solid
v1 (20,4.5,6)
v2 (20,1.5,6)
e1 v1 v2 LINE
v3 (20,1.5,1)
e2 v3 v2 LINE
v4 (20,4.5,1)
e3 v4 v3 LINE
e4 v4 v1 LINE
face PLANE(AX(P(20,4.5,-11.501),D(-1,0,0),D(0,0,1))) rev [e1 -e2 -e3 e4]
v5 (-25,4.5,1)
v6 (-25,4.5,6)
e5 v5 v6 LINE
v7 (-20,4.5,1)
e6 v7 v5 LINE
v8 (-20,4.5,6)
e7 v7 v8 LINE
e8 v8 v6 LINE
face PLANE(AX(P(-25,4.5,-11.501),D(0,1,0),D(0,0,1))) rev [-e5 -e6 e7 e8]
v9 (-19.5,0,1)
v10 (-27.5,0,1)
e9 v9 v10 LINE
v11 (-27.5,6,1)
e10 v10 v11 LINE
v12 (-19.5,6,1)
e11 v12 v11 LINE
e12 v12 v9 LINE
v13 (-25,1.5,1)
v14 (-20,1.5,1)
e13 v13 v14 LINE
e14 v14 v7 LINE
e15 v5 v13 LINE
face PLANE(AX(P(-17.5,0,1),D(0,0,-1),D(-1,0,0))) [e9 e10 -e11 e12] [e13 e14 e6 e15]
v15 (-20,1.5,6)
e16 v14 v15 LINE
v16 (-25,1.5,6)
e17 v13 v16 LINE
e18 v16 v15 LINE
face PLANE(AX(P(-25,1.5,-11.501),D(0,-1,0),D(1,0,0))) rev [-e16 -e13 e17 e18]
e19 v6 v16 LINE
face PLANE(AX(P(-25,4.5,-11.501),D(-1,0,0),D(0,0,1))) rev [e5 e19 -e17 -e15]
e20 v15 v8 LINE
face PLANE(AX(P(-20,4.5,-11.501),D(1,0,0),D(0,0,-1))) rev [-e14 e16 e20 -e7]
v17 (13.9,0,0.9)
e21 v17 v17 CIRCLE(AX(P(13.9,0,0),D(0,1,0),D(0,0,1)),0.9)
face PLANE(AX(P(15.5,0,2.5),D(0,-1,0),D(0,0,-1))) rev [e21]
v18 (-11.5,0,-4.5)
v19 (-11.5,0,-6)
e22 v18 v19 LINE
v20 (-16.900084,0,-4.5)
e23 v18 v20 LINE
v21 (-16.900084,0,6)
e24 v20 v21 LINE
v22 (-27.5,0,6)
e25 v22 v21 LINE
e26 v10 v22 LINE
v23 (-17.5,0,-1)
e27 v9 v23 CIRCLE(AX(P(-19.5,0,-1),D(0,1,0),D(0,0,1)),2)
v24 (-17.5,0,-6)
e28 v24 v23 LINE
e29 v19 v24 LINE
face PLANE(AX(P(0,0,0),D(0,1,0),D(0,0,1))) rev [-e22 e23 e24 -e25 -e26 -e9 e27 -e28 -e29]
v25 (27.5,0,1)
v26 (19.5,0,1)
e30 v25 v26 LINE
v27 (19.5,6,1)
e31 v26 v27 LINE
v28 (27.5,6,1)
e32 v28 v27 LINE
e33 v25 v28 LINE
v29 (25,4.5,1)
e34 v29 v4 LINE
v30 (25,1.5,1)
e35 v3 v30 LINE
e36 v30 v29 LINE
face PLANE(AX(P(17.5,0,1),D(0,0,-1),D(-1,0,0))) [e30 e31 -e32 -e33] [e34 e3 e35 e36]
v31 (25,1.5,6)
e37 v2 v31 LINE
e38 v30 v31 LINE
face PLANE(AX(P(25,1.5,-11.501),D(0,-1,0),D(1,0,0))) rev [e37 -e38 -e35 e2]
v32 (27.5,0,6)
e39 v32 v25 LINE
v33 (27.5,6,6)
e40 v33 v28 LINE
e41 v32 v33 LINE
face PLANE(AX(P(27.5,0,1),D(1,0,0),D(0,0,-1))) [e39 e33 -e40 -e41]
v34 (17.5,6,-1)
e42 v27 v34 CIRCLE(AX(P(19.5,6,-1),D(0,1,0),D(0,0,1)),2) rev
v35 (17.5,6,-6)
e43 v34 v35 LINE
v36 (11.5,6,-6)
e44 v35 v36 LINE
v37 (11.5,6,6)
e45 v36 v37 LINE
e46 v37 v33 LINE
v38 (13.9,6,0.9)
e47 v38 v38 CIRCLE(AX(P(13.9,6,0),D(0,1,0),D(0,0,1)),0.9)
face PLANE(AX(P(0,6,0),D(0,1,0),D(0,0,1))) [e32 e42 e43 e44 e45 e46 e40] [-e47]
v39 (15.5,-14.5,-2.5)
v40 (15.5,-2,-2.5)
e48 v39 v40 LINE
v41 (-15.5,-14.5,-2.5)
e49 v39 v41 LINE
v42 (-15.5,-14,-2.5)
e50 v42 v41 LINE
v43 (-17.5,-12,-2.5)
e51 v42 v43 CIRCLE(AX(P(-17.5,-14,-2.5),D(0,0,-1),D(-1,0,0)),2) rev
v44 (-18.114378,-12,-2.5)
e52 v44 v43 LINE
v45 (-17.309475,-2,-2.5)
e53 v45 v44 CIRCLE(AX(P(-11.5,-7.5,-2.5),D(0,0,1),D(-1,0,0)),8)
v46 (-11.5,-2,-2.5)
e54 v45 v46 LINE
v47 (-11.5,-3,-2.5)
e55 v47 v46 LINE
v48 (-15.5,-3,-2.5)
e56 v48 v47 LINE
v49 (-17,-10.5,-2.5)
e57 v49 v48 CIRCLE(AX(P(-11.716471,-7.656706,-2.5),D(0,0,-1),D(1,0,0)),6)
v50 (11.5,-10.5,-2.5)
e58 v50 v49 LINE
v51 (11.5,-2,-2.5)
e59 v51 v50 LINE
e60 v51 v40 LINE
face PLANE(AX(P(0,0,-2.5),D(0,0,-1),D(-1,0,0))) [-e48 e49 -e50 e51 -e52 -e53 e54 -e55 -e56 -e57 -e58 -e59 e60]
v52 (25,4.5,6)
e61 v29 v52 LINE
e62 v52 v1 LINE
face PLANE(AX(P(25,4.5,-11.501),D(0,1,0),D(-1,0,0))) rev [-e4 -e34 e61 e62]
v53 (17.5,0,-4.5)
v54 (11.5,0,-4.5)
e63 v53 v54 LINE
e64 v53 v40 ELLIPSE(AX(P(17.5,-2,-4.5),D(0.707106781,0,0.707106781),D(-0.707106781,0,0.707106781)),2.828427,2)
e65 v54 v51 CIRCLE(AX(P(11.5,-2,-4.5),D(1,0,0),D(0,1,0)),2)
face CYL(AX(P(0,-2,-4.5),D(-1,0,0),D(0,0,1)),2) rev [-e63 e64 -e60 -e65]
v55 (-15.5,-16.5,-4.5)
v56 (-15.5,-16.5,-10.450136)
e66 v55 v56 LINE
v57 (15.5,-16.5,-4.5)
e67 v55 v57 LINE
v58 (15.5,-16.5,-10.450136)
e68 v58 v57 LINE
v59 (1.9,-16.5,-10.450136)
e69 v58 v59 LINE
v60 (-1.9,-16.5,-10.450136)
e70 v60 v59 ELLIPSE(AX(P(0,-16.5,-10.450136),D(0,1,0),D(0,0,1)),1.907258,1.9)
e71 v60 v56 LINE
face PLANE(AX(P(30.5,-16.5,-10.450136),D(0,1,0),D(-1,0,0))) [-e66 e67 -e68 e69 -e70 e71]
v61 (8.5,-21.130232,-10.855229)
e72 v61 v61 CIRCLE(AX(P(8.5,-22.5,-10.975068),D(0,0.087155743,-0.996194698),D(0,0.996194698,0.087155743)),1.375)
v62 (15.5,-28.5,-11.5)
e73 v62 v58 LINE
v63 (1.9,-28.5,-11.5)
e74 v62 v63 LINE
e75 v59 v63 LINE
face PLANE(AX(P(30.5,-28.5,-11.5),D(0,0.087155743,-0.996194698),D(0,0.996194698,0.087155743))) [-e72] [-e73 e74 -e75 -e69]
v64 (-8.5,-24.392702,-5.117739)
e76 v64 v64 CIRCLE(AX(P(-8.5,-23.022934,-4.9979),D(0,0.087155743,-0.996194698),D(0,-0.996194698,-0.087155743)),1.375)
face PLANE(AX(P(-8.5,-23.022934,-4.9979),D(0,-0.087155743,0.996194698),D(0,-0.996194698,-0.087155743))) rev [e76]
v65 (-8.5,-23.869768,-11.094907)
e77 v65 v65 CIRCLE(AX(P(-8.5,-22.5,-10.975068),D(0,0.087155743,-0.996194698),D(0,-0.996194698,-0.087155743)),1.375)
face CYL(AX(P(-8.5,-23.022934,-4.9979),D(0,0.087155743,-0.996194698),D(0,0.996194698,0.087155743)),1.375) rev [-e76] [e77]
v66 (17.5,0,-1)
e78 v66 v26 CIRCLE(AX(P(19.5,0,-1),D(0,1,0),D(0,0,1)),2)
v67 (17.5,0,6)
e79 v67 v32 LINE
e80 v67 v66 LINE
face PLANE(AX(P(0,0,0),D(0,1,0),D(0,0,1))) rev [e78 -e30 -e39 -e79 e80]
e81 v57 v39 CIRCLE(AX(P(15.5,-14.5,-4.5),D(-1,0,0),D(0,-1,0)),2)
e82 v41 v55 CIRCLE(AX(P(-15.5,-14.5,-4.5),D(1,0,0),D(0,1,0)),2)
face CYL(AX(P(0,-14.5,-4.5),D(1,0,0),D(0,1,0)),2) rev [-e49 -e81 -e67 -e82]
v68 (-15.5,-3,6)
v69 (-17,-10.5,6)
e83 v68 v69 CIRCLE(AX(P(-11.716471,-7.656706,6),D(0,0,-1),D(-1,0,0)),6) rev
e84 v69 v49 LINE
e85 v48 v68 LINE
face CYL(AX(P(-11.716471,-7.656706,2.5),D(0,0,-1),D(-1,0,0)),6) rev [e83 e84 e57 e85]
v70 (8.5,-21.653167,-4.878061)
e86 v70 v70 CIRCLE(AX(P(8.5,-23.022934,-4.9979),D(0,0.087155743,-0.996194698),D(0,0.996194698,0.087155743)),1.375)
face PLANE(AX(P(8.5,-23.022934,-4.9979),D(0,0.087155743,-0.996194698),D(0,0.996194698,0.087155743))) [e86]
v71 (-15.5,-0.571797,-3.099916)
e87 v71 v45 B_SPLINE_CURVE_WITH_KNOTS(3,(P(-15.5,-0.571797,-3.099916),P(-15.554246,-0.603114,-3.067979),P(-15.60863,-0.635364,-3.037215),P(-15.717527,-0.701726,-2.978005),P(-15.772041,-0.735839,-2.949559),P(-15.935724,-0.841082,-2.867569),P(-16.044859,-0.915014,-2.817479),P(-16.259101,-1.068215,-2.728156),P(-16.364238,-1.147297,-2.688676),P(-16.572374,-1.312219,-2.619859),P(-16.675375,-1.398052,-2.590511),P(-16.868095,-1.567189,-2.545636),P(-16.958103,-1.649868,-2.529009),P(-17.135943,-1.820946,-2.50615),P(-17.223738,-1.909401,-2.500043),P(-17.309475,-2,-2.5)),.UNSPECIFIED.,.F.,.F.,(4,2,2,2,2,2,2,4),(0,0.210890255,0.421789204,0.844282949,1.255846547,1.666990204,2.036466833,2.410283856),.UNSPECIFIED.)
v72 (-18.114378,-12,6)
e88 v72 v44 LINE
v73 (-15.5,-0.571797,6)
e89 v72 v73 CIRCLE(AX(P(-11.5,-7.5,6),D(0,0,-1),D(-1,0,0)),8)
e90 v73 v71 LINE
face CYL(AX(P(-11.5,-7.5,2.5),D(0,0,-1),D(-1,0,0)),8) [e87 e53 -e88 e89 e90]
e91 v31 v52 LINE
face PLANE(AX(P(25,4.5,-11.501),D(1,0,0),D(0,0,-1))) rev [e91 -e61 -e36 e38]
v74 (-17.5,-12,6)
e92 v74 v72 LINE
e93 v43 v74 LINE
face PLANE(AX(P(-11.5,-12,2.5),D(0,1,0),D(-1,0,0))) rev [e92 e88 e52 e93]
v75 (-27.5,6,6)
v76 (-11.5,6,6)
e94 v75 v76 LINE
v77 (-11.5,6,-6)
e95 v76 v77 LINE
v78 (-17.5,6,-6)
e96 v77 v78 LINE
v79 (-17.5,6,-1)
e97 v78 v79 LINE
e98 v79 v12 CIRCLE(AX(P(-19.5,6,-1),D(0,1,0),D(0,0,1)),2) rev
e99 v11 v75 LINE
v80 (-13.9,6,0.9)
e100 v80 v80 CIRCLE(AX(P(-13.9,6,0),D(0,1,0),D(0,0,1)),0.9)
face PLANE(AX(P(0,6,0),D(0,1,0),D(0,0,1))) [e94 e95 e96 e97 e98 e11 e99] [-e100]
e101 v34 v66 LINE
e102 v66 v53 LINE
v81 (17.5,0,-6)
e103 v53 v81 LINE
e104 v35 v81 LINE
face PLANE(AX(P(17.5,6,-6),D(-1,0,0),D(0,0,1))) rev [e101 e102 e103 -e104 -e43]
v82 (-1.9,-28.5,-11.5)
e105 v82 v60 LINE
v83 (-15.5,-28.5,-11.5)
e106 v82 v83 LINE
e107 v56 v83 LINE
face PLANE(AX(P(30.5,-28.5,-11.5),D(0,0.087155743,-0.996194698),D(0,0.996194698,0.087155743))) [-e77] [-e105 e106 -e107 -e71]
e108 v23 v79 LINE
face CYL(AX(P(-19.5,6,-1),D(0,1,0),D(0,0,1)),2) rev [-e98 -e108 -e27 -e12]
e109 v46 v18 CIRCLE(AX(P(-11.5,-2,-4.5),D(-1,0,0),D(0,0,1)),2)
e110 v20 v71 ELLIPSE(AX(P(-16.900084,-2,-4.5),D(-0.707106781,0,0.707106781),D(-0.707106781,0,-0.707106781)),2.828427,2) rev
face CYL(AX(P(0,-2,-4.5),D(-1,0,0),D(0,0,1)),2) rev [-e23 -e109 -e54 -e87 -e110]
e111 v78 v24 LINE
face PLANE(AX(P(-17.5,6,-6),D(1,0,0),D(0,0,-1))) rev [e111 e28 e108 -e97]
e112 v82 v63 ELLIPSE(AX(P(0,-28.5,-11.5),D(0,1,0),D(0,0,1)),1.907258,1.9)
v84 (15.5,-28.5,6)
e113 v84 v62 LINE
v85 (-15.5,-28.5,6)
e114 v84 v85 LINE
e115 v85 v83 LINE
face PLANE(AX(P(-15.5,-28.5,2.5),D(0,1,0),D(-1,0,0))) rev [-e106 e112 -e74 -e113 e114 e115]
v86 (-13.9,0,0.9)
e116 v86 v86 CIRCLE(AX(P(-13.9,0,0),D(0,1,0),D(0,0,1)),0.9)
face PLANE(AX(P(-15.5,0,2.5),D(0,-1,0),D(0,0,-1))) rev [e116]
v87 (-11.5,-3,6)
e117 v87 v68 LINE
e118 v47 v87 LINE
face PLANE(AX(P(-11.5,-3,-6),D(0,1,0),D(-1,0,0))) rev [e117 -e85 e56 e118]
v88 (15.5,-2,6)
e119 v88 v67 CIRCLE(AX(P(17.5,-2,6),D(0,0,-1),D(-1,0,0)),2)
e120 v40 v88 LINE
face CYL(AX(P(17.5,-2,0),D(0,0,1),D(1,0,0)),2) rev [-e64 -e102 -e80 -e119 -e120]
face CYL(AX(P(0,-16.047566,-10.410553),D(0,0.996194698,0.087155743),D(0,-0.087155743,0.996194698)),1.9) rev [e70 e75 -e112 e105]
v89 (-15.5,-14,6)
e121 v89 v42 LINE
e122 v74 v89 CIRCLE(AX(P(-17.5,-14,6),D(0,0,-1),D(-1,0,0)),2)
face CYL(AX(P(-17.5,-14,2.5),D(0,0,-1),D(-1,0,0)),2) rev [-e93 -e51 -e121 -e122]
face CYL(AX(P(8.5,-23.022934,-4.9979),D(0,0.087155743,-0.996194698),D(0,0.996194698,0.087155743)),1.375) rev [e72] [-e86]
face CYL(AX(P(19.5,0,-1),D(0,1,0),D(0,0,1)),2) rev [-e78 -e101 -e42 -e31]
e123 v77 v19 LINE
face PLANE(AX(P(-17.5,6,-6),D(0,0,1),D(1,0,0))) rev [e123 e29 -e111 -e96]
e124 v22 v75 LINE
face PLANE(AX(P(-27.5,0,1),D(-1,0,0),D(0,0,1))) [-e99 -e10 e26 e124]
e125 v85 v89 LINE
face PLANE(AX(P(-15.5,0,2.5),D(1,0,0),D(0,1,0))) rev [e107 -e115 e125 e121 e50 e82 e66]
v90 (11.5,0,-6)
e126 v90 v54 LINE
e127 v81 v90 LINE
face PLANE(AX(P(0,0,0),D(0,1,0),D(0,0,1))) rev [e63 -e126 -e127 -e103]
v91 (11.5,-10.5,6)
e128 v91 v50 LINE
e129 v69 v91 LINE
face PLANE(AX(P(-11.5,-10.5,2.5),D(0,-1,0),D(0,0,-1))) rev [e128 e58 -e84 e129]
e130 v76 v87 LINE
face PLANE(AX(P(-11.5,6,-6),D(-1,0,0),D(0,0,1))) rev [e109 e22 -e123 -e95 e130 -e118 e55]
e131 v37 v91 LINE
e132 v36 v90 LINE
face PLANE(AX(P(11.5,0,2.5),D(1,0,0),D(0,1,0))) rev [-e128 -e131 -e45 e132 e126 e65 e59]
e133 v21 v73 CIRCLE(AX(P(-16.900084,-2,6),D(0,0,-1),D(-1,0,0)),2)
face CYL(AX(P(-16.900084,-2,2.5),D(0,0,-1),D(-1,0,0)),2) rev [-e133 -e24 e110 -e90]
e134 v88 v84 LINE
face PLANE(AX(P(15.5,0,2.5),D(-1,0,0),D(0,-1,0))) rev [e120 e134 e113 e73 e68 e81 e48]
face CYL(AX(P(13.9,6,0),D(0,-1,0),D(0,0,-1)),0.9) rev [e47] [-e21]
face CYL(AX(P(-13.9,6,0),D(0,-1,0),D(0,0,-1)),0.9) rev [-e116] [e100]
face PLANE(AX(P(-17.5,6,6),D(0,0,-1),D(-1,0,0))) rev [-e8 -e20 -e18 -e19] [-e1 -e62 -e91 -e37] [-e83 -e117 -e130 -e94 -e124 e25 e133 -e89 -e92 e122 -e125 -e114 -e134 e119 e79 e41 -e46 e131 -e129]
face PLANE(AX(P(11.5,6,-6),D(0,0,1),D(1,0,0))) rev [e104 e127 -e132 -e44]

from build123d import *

# Parameters (mm, degrees)
SKETCH1_W                   = 6
SKETCH1_H                   = 12
SKETCH1_R                   = 0.9
SERVO_MOUNTING_BASE_DEPTH   = 6
SERVO_MOUNTING_BASE_2_DEPTH = 6
SERVO_ENCLOSING_FRAME_DEPTH = 2.5
WIRE_SLOT_DEPTH             = 34.977934016
WIRE_SLOT_DEPTH_BACK        = 34.977934016
SKETCH6_W                   = 4
SKETCH6_H                   = 9
WIRE_COMPENSATION_DEPTH     = 2.5
CLAMP_EXTENSION_DEPTH       = 31
SKETCH12_W                  = 1.9
SKETCH12_H                  = 12.5
SKETCH13_R                  = 1.375
CLAMP_SCREW_HOLES_DEPTH     = 6
SKETCH15_W                  = 10
SKETCH15_H                  = 5
ZIPTIE_FLAPS_DEPTH          = 6
ZIPTIE_HOLES_REACH          = 45.298
SKETCH17_W                  = 5
SKETCH17_H                  = 3
FRONT_EXTENSION_DEPTH       = 3.5
F_2MM_FILLETS_R             = 2
MORE_2MM_FILLETS_R          = 2


with BuildPart() as part:
    # Sketch1 → Servo Mounting Base (new body)
    with BuildSketch(Plane(origin=(0, 0, 0), x_dir=(1, 0, 0), z_dir=(0, 1, 0))):
        with Locations((-14.5, 0)):
            Rectangle(SKETCH1_W, SKETCH1_H)
        with Locations(Location((-13.9, 0, 0), (0, 0, 270))):
            Circle(SKETCH1_R, mode=Mode.SUBTRACT)
    extrude(amount=SERVO_MOUNTING_BASE_DEPTH)



with BuildPart() as body_2:
    # Sketch1 → Servo Mounting Base 2 (new body)
    with BuildSketch(Plane(origin=(0, 0, 0), x_dir=(1, 0, 0), z_dir=(0, 1, 0))):
        with Locations((14.5, 0)):
            Rectangle(SKETCH1_W, SKETCH1_H)
        with Locations(Location((13.9, 0, 0), (0, 0, 270))):
            Circle(SKETCH1_R, mode=Mode.SUBTRACT)
    extrude(amount=SERVO_MOUNTING_BASE_2_DEPTH)


with BuildPart() as part_1:
    add(part.part)

    add(body_2.part)  # Servo Enclosing Frame merges body 2
    # Sketch2 → Servo Enclosing Frame (add, symmetric)
    with BuildSketch(Plane.XY):
        Polygon((-15.5, 0), (-15.5, -28.5), (15.5, -28.5), (15.5, 0), (11.5, 0), (11.5, -10.5), (-11.5, -10.5), (-11.5, 0), align=None)
    extrude(amount=SERVO_ENCLOSING_FRAME_DEPTH, both=True)

    # Sketch6 → Wire Slot (cut, two sides: drawn at the far end of the back side and taken through both)
    with BuildSketch(Plane.XY.offset(-WIRE_SLOT_DEPTH_BACK)):
        with Locations((-13.5, -7.5)):
            Rectangle(SKETCH6_W, SKETCH6_H)
    extrude(amount=WIRE_SLOT_DEPTH + WIRE_SLOT_DEPTH_BACK, mode=Mode.SUBTRACT)


with BuildPart() as wire_slot_piece_1:
    # of the separate pieces the step leaves, piece 1, a body of its own (wire_slot_pieces)
    add(part_1.part.solids().sort_by_distance((11.5, -10.5, -2.5))[0])



with BuildPart() as wire_slot_piece_2:
    # of the separate pieces the step leaves, piece 2, a body of its own (wire_slot_pieces)
    add(part_1.part.solids().sort_by_distance((-17.5, 0, -6))[0])


with BuildPart() as wire_slot_piece_1_1:
    add(wire_slot_piece_1.part)

    add(wire_slot_piece_2.part)  # Wire Compensation merges Wire Slot piece 2
    # Sketch7 → Wire Compensation (add, symmetric)
    with BuildSketch(Plane.XY):
        with BuildLine():
            Line((-11.5, -12), (-18.114378278, -12))
            ThreePointArc((-18.114378278, -12), (-19.298539211, -5.715963516), (-15.5, -0.57179677))
            Line((-15.5, -0.57179677), (-15.5, -3))
            ThreePointArc((-15.5, -3), (-17.599955118, -6.480008976), (-17, -10.5))
            Line((-17, -10.5), (-11.5, -10.5))
            Line((-11.5, -10.5), (-11.5, -12))
        make_face()
    extrude(amount=WIRE_COMPENSATION_DEPTH, both=True)

    # Sketch9 → Clamp Extension (add)
    with BuildSketch(Plane.ZY.offset(15.5)):
        Polygon((-2.5, -28.5), (-11.5, -28.5), (-10.450136038, -16.5), (-2.5, -16.5), align=None)
    extrude(amount=-CLAMP_EXTENSION_DEPTH)

    # Sketch12 → Wire Groove (revolve, cut)
    with BuildSketch(Plane(origin=(0, 0.781987502, -8.938158048), x_dir=(-1, 0, 0), z_dir=(0, 0.08715574274766176, -0.9961946980917453))):
        with Locations((-0.95, -23.143839937)):
            Rectangle(SKETCH12_W, SKETCH12_H)
    revolve(axis=Axis((0, -16.047566274, -10.410553216), (0, -0.9961946980917452, -0.0871557427476618)), mode=Mode.SUBTRACT)

    # Sketch13 → Clamp Screw Holes (cut)
    with BuildSketch(Plane(origin=(0, 0.781987502, -8.938158048), x_dir=(-1, 0, 0), z_dir=(0, 0.08715574274766176, -0.9961946980917453))):
        with Locations(Location((-8.5, -23.370920912, 0), (0, 0, 90))):
            Circle(SKETCH13_R)
        with Locations(Location((8.5, -23.370920912, 0), (0, 0, 270))):
            Circle(SKETCH13_R)
    extrude(amount=-CLAMP_SCREW_HOLES_DEPTH, mode=Mode.SUBTRACT)

    # Sketch15 → Ziptie Flaps (add)
    with BuildSketch(Plane(origin=(0, 6, 0), x_dir=(1, 0, 0), z_dir=(0, 1, 0))):
        with Locations((-22.5, -3.5)):
            Rectangle(SKETCH15_W, SKETCH15_H)
        with Locations((22.5, -3.5)):
            Rectangle(SKETCH15_W, SKETCH15_H)
    extrude(amount=-ZIPTIE_FLAPS_DEPTH)

    # Sketch17 → Ziptie Holes (cut, up to next)
    with BuildSketch(Plane.XY.offset(6), mode=Mode.PRIVATE) as ziptie_holes_sk1:
        with Locations((-22.5, 3)):
            Rectangle(SKETCH17_W, SKETCH17_H)
    ziptie_holes_tool1 = extrude(ziptie_holes_sk1.sketch, amount=-ZIPTIE_HOLES_REACH, mode=Mode.PRIVATE) & wire_slot_piece_1_1.part
    # Sketch17 → Ziptie Holes (cut, up to next)
    with BuildSketch(Plane.XY.offset(6), mode=Mode.PRIVATE) as ziptie_holes_sk2:
        with Locations((22.5, 3)):
            Rectangle(SKETCH17_W, SKETCH17_H)
    ziptie_holes_tool2 = extrude(ziptie_holes_sk2.sketch, amount=-ZIPTIE_HOLES_REACH, mode=Mode.PRIVATE) & wire_slot_piece_1_1.part
    add(ziptie_holes_tool1.solids().sort_by_distance((-22.5, 3, 6))[0], mode=Mode.SUBTRACT)
    add(ziptie_holes_tool2.solids().sort_by_distance((22.5, 3, 6))[0], mode=Mode.SUBTRACT)

    # Sketch16 → Front Extension (add)
    with BuildSketch(Plane.XY.offset(2.5)):
        with BuildLine():
            Line((-15.5, 0), (-15.5, -0.57179677))
            ThreePointArc((-15.5, -0.57179677), (-19.298539211, -5.715963516), (-18.114378278, -12))
            Line((-18.114378278, -12), (-15.5, -12))
            Line((-15.5, -12), (-15.5, -28.5))
            Line((-15.5, -28.5), (15.5, -28.5))
            Line((15.5, -28.5), (15.5, 0))
            Line((15.5, 0), (11.5, 0))
            Line((11.5, 0), (11.5, -10.5))
            Line((11.5, -10.5), (-17, -10.5))
            ThreePointArc((-17, -10.5), (-17.599955118, -6.480008976), (-15.5, -3))
            Line((-15.5, -3), (-11.5, -3))
            Line((-11.5, -3), (-11.5, 0))
            Line((-11.5, 0), (-15.5, 0))
        make_face()
    extrude(amount=FRONT_EXTENSION_DEPTH)

    # 2mm Fillets
    # the kernel refuses this fillet: 2 mm, written as the material it adds along each edge
    with BuildSketch(Plane(origin=(15.5, 0, 6), x_dir=(1, 0, 0), z_dir=(0, 0, -1)), Plane(origin=(-15.5, -12, 6), x_dir=(0, -1, 0), z_dir=(0, 0, -1))) as f_2mm_fillets_piece_1:
        with BuildLine():
            CenterArc((F_2MM_FILLETS_R, F_2MM_FILLETS_R), F_2MM_FILLETS_R, 180, 90)
            Line((0, F_2MM_FILLETS_R), (-F_2MM_FILLETS_R * 0.02, F_2MM_FILLETS_R))
            Line((-F_2MM_FILLETS_R * 0.02, F_2MM_FILLETS_R), (-F_2MM_FILLETS_R * 0.02, -F_2MM_FILLETS_R * 0.02))
            Line((-F_2MM_FILLETS_R * 0.02, -F_2MM_FILLETS_R * 0.02), (F_2MM_FILLETS_R, -F_2MM_FILLETS_R * 0.02))
            Line((F_2MM_FILLETS_R, -F_2MM_FILLETS_R * 0.02), (F_2MM_FILLETS_R, 0))
        make_face()
    extrude(amount=8.5)
    with BuildSketch(Plane(origin=(15.5, 0, -2.5), x_dir=(0, -1, 0), z_dir=(-1, 0, 0))) as f_2mm_fillets_piece_2:
        with BuildLine():
            CenterArc((F_2MM_FILLETS_R, -F_2MM_FILLETS_R), F_2MM_FILLETS_R, 90, 90)
            Line((0, -F_2MM_FILLETS_R), (-F_2MM_FILLETS_R * 0.02, -F_2MM_FILLETS_R))
            Line((-F_2MM_FILLETS_R * 0.02, -F_2MM_FILLETS_R), (-F_2MM_FILLETS_R * 0.02, F_2MM_FILLETS_R * 0.02))
            Line((-F_2MM_FILLETS_R * 0.02, F_2MM_FILLETS_R * 0.02), (F_2MM_FILLETS_R, F_2MM_FILLETS_R * 0.02))
            Line((F_2MM_FILLETS_R, F_2MM_FILLETS_R * 0.02), (F_2MM_FILLETS_R, 0))
        make_face()
    extrude(amount=4)
    with BuildSketch(Plane(origin=(-15.5, -16.5, -2.5), x_dir=(0, 1, 0), z_dir=(1, 0, 0))) as f_2mm_fillets_piece_3:
        with BuildLine():
            CenterArc((F_2MM_FILLETS_R, -F_2MM_FILLETS_R), F_2MM_FILLETS_R, 90, 90)
            Line((0, -F_2MM_FILLETS_R), (-F_2MM_FILLETS_R * 0.02, -F_2MM_FILLETS_R))
            Line((-F_2MM_FILLETS_R * 0.02, -F_2MM_FILLETS_R), (-F_2MM_FILLETS_R * 0.02, F_2MM_FILLETS_R * 0.02))
            Line((-F_2MM_FILLETS_R * 0.02, F_2MM_FILLETS_R * 0.02), (F_2MM_FILLETS_R, F_2MM_FILLETS_R * 0.02))
            Line((F_2MM_FILLETS_R, F_2MM_FILLETS_R * 0.02), (F_2MM_FILLETS_R, 0))
        make_face()
    extrude(amount=31)
    with BuildSketch(Plane(origin=(-17.5, 6, 1), x_dir=(-1, 0, 0), z_dir=(0, -1, 0))) as f_2mm_fillets_piece_4:
        with BuildLine():
            CenterArc((F_2MM_FILLETS_R, F_2MM_FILLETS_R), F_2MM_FILLETS_R, 180, 90)
            Line((0, F_2MM_FILLETS_R), (-F_2MM_FILLETS_R * 0.02, F_2MM_FILLETS_R))
            Line((-F_2MM_FILLETS_R * 0.02, F_2MM_FILLETS_R), (-F_2MM_FILLETS_R * 0.02, -F_2MM_FILLETS_R * 0.02))
            Line((-F_2MM_FILLETS_R * 0.02, -F_2MM_FILLETS_R * 0.02), (F_2MM_FILLETS_R, -F_2MM_FILLETS_R * 0.02))
            Line((F_2MM_FILLETS_R, -F_2MM_FILLETS_R * 0.02), (F_2MM_FILLETS_R, 0))
        make_face()
    extrude(amount=6)
    with BuildSketch(Plane(origin=(-11.5, 0, -2.5), x_dir=(0, -1, 0), z_dir=(-1, 0, 0))) as f_2mm_fillets_piece_5_section:
        with BuildLine():
            CenterArc((F_2MM_FILLETS_R, -F_2MM_FILLETS_R), F_2MM_FILLETS_R, 90, 90)
            Line((0, -F_2MM_FILLETS_R), (-F_2MM_FILLETS_R * 0.02, -F_2MM_FILLETS_R))
            Line((-F_2MM_FILLETS_R * 0.02, -F_2MM_FILLETS_R), (-F_2MM_FILLETS_R * 0.02, F_2MM_FILLETS_R * 0.02))
            Line((-F_2MM_FILLETS_R * 0.02, F_2MM_FILLETS_R * 0.02), (F_2MM_FILLETS_R, F_2MM_FILLETS_R * 0.02))
            Line((F_2MM_FILLETS_R, F_2MM_FILLETS_R * 0.02), (F_2MM_FILLETS_R, 0))
        make_face()
    f_2mm_fillets_piece_5 = extrude(amount=4, mode=Mode.PRIVATE)
    f_2mm_fillets_piece_5 = f_2mm_fillets_piece_5 & Plane(origin=(-11.5, -7.5, -2.916455702), x_dir=(-0.8267972847076845, -0.5625, 0), z_dir=(0, 0, 1)) * Cylinder(8, 16, mode=Mode.PRIVATE)
    add(f_2mm_fillets_piece_5)
    with BuildSketch(Plane(origin=(-11.5, 0, -2.5), x_dir=(0, -1, 0), z_dir=(-1, 0, 0))) as f_2mm_fillets_piece_6_section:
        with BuildLine():
            CenterArc((F_2MM_FILLETS_R, -F_2MM_FILLETS_R), F_2MM_FILLETS_R, 90, 90)
            Line((0, -F_2MM_FILLETS_R), (-F_2MM_FILLETS_R * 0.02, -F_2MM_FILLETS_R))
            Line((-F_2MM_FILLETS_R * 0.02, -F_2MM_FILLETS_R), (-F_2MM_FILLETS_R * 0.02, F_2MM_FILLETS_R * 0.02))
            Line((-F_2MM_FILLETS_R * 0.02, F_2MM_FILLETS_R * 0.02), (F_2MM_FILLETS_R, F_2MM_FILLETS_R * 0.02))
            Line((F_2MM_FILLETS_R, F_2MM_FILLETS_R * 0.02), (F_2MM_FILLETS_R, 0))
        make_face()
    f_2mm_fillets_piece_6 = extrude(amount=4, mode=Mode.PRIVATE)
    f_2mm_fillets_piece_6 = f_2mm_fillets_piece_6 - Plane(origin=(-11.5, -7.5, -3.204669356), x_dir=(-0.8267972847076845, -0.5625, 0), z_dir=(0, 0, 1)) * Cylinder(8, 16, mode=Mode.PRIVATE)
    add(f_2mm_fillets_piece_6)
    with BuildSketch(Plane(origin=(-11.5, 0, -2.5), x_dir=(0, -1, 0), z_dir=(-1, 0, 0))) as f_2mm_fillets_piece_7_section:
        with BuildLine():
            CenterArc((F_2MM_FILLETS_R, -F_2MM_FILLETS_R), F_2MM_FILLETS_R, 90, 90)
            Line((0, -F_2MM_FILLETS_R), (-F_2MM_FILLETS_R * 0.02, -F_2MM_FILLETS_R))
            Line((-F_2MM_FILLETS_R * 0.02, -F_2MM_FILLETS_R), (-F_2MM_FILLETS_R * 0.02, F_2MM_FILLETS_R * 0.02))
            Line((-F_2MM_FILLETS_R * 0.02, F_2MM_FILLETS_R * 0.02), (F_2MM_FILLETS_R, F_2MM_FILLETS_R * 0.02))
            Line((F_2MM_FILLETS_R, F_2MM_FILLETS_R * 0.02), (F_2MM_FILLETS_R, 0))
        make_face()
    f_2mm_fillets_piece_7 = extrude(amount=9, mode=Mode.PRIVATE)
    f_2mm_fillets_piece_7 = f_2mm_fillets_piece_7 & Plane(origin=(-11.5, -7.5, -2.577343051), x_dir=(-0.8267972847076845, -0.5625, 0), z_dir=(0, 0, 1)) * Cylinder(8, 26, mode=Mode.PRIVATE)
    f_2mm_fillets_piece_7 = split(f_2mm_fillets_piece_7, bisect_by=Plane(origin=(-15.5, -1.226769703, -2.577343051), z_dir=(-1, 0, 0)), keep=Keep.TOP, mode=Mode.PRIVATE)
    add(f_2mm_fillets_piece_7)
    with BuildSketch(Plane(origin=(-15.5, 0, -2.5), x_dir=(0, -1, 0), z_dir=(0, 0, 1))) as f_2mm_fillets_piece_8:
        with BuildLine():
            CenterArc((2, -1.400084116), F_2MM_FILLETS_R, 135.569621566, 44.430378434)
            Line((0, -1.400084116), (-0.04, -1.400084116))
            Line((-0.04, -1.400084116), (-0.04, 0))
            Line((-0.04, 0), (0, 0.04))
            ThreePointArc((0, 0.04), (0.285898385, 0.04), (0.543232705, 0.028001682))
            Line((0.543232705, 0.028001682), (0.57179677, 0))
        make_face()
    extrude(amount=8.5)
    with BuildSketch(Plane(origin=(20.5, 0, -2.5), x_dir=(0, -1, 0), z_dir=(-1, 0, 0))) as f_2mm_fillets_piece_9a_section:
        with BuildLine():
            CenterArc((F_2MM_FILLETS_R, -F_2MM_FILLETS_R), F_2MM_FILLETS_R, 90, 90)
            Line((0, -F_2MM_FILLETS_R), (-F_2MM_FILLETS_R * 0.02, -F_2MM_FILLETS_R))
            Line((-F_2MM_FILLETS_R * 0.02, -F_2MM_FILLETS_R), (-F_2MM_FILLETS_R * 0.02, F_2MM_FILLETS_R * 0.02))
            Line((-F_2MM_FILLETS_R * 0.02, F_2MM_FILLETS_R * 0.02), (F_2MM_FILLETS_R, F_2MM_FILLETS_R * 0.02))
            Line((F_2MM_FILLETS_R, F_2MM_FILLETS_R * 0.02), (F_2MM_FILLETS_R, 0))
        make_face()
    f_2mm_fillets_piece_9a = extrude(amount=9, mode=Mode.PRIVATE)
    f_2mm_fillets_piece_9a = split(f_2mm_fillets_piece_9a, bisect_by=Plane(origin=(17.5, -0.452790229, -2.952790229), z_dir=(-1, 0, 0)), keep=Keep.TOP, mode=Mode.PRIVATE)
    f_2mm_fillets_piece_9a = split(f_2mm_fillets_piece_9a, bisect_by=Plane(origin=(15.5, -0.452790229, -2.952790229), z_dir=(1, 0, 0)), keep=Keep.TOP, mode=Mode.PRIVATE)
    with BuildSketch(Plane(origin=(15.5, 0, 6), x_dir=(1, 0, 0), z_dir=(0, 0, -1))) as f_2mm_fillets_piece_9b_section:
        with BuildLine():
            CenterArc((F_2MM_FILLETS_R, F_2MM_FILLETS_R), F_2MM_FILLETS_R, 180, 90)
            Line((0, F_2MM_FILLETS_R), (-F_2MM_FILLETS_R * 0.02, F_2MM_FILLETS_R))
            Line((-F_2MM_FILLETS_R * 0.02, F_2MM_FILLETS_R), (-F_2MM_FILLETS_R * 0.02, -F_2MM_FILLETS_R * 0.02))
            Line((-F_2MM_FILLETS_R * 0.02, -F_2MM_FILLETS_R * 0.02), (F_2MM_FILLETS_R, -F_2MM_FILLETS_R * 0.02))
            Line((F_2MM_FILLETS_R, -F_2MM_FILLETS_R * 0.02), (F_2MM_FILLETS_R, 0))
        make_face()
    f_2mm_fillets_piece_9b = extrude(amount=13.5, mode=Mode.PRIVATE)
    f_2mm_fillets_piece_9b = split(f_2mm_fillets_piece_9b, bisect_by=Plane(origin=(15.952790229, -0.452790229, -6), z_dir=(0, 0, 1)), keep=Keep.TOP, mode=Mode.PRIVATE)
    f_2mm_fillets_piece_9b = split(f_2mm_fillets_piece_9b, bisect_by=Plane(origin=(15.952790229, -0.452790229, -2.5), z_dir=(0, 0, -1)), keep=Keep.TOP, mode=Mode.PRIVATE)
    f_2mm_fillets_piece_9 = f_2mm_fillets_piece_9a & f_2mm_fillets_piece_9b
    add(f_2mm_fillets_piece_9)
    with BuildSketch(Plane(origin=(-11.5, 0, -2.5), x_dir=(0, -1, 0), z_dir=(-1, 0, 0))) as f_2mm_fillets_piece_10a_section:
        with BuildLine():
            CenterArc((F_2MM_FILLETS_R, -F_2MM_FILLETS_R), F_2MM_FILLETS_R, 90, 90)
            Line((0, -F_2MM_FILLETS_R), (-F_2MM_FILLETS_R * 0.02, -F_2MM_FILLETS_R))
            Line((-F_2MM_FILLETS_R * 0.02, -F_2MM_FILLETS_R), (-F_2MM_FILLETS_R * 0.02, F_2MM_FILLETS_R * 0.02))
            Line((-F_2MM_FILLETS_R * 0.02, F_2MM_FILLETS_R * 0.02), (F_2MM_FILLETS_R, F_2MM_FILLETS_R * 0.02))
            Line((F_2MM_FILLETS_R, F_2MM_FILLETS_R * 0.02), (F_2MM_FILLETS_R, 0))
        make_face()
    f_2mm_fillets_piece_10a = extrude(amount=9, mode=Mode.PRIVATE)
    f_2mm_fillets_piece_10a = f_2mm_fillets_piece_10a - Plane(origin=(-11.5, -7.5, -2.992619428), x_dir=(-0.8267972847076845, -0.5625, 0), z_dir=(0, 0, 1)) * Cylinder(8, 26, mode=Mode.PRIVATE)
    f_2mm_fillets_piece_10a = split(f_2mm_fillets_piece_10a, bisect_by=Plane(origin=(-15.5, -0.370682852, -2.992619428), z_dir=(-1, 0, 0)), keep=Keep.TOP, mode=Mode.PRIVATE)
    f_2mm_fillets_piece_10a = split(f_2mm_fillets_piece_10a, bisect_by=Plane(origin=(-17.5, -0.370682852, -2.992619428), z_dir=(1, 0, 0)), keep=Keep.TOP, mode=Mode.PRIVATE)
    with BuildSketch(Plane(origin=(-15.5, 0, -6.000210291), x_dir=(0, -1, 0), z_dir=(0, 0, 1))) as f_2mm_fillets_piece_10b_section:
        with BuildLine():
            CenterArc((2, -1.400084116), F_2MM_FILLETS_R, 135.569621566, 44.430378434)
            Line((0, -1.400084116), (-0.04, -1.400084116))
            Line((-0.04, -1.400084116), (-0.04, 0))
            Line((-0.04, 0), (0, 0.04))
            ThreePointArc((0, 0.04), (0.285898385, 0.04), (0.543232705, 0.028001682))
            Line((0.543232705, 0.028001682), (0.57179677, 0))
        make_face()
    f_2mm_fillets_piece_10b = extrude(amount=12.000210291, mode=Mode.PRIVATE)
    f_2mm_fillets_piece_10b = split(f_2mm_fillets_piece_10b, bisect_by=Plane(origin=(-15.876915422, -0.140265122, -6), z_dir=(0, 0, 1)), keep=Keep.TOP, mode=Mode.PRIVATE)
    f_2mm_fillets_piece_10b = split(f_2mm_fillets_piece_10b, bisect_by=Plane(origin=(-15.876915422, -0.140265122, -2.5), z_dir=(0, 0, -1)), keep=Keep.TOP, mode=Mode.PRIVATE)
    f_2mm_fillets_piece_10 = f_2mm_fillets_piece_10a & f_2mm_fillets_piece_10b
    add(f_2mm_fillets_piece_10)

    # More 2mm Fillets
    more_2mm_fillets_edges = [wire_slot_piece_1_1.edges().sort_by_distance(p)[0] for p in [
        (17.5, 3, 1),
    ]]
    fillet(more_2mm_fillets_edges, radius=MORE_2MM_FILLETS_R)


solid = wire_slot_piece_1_1.part
